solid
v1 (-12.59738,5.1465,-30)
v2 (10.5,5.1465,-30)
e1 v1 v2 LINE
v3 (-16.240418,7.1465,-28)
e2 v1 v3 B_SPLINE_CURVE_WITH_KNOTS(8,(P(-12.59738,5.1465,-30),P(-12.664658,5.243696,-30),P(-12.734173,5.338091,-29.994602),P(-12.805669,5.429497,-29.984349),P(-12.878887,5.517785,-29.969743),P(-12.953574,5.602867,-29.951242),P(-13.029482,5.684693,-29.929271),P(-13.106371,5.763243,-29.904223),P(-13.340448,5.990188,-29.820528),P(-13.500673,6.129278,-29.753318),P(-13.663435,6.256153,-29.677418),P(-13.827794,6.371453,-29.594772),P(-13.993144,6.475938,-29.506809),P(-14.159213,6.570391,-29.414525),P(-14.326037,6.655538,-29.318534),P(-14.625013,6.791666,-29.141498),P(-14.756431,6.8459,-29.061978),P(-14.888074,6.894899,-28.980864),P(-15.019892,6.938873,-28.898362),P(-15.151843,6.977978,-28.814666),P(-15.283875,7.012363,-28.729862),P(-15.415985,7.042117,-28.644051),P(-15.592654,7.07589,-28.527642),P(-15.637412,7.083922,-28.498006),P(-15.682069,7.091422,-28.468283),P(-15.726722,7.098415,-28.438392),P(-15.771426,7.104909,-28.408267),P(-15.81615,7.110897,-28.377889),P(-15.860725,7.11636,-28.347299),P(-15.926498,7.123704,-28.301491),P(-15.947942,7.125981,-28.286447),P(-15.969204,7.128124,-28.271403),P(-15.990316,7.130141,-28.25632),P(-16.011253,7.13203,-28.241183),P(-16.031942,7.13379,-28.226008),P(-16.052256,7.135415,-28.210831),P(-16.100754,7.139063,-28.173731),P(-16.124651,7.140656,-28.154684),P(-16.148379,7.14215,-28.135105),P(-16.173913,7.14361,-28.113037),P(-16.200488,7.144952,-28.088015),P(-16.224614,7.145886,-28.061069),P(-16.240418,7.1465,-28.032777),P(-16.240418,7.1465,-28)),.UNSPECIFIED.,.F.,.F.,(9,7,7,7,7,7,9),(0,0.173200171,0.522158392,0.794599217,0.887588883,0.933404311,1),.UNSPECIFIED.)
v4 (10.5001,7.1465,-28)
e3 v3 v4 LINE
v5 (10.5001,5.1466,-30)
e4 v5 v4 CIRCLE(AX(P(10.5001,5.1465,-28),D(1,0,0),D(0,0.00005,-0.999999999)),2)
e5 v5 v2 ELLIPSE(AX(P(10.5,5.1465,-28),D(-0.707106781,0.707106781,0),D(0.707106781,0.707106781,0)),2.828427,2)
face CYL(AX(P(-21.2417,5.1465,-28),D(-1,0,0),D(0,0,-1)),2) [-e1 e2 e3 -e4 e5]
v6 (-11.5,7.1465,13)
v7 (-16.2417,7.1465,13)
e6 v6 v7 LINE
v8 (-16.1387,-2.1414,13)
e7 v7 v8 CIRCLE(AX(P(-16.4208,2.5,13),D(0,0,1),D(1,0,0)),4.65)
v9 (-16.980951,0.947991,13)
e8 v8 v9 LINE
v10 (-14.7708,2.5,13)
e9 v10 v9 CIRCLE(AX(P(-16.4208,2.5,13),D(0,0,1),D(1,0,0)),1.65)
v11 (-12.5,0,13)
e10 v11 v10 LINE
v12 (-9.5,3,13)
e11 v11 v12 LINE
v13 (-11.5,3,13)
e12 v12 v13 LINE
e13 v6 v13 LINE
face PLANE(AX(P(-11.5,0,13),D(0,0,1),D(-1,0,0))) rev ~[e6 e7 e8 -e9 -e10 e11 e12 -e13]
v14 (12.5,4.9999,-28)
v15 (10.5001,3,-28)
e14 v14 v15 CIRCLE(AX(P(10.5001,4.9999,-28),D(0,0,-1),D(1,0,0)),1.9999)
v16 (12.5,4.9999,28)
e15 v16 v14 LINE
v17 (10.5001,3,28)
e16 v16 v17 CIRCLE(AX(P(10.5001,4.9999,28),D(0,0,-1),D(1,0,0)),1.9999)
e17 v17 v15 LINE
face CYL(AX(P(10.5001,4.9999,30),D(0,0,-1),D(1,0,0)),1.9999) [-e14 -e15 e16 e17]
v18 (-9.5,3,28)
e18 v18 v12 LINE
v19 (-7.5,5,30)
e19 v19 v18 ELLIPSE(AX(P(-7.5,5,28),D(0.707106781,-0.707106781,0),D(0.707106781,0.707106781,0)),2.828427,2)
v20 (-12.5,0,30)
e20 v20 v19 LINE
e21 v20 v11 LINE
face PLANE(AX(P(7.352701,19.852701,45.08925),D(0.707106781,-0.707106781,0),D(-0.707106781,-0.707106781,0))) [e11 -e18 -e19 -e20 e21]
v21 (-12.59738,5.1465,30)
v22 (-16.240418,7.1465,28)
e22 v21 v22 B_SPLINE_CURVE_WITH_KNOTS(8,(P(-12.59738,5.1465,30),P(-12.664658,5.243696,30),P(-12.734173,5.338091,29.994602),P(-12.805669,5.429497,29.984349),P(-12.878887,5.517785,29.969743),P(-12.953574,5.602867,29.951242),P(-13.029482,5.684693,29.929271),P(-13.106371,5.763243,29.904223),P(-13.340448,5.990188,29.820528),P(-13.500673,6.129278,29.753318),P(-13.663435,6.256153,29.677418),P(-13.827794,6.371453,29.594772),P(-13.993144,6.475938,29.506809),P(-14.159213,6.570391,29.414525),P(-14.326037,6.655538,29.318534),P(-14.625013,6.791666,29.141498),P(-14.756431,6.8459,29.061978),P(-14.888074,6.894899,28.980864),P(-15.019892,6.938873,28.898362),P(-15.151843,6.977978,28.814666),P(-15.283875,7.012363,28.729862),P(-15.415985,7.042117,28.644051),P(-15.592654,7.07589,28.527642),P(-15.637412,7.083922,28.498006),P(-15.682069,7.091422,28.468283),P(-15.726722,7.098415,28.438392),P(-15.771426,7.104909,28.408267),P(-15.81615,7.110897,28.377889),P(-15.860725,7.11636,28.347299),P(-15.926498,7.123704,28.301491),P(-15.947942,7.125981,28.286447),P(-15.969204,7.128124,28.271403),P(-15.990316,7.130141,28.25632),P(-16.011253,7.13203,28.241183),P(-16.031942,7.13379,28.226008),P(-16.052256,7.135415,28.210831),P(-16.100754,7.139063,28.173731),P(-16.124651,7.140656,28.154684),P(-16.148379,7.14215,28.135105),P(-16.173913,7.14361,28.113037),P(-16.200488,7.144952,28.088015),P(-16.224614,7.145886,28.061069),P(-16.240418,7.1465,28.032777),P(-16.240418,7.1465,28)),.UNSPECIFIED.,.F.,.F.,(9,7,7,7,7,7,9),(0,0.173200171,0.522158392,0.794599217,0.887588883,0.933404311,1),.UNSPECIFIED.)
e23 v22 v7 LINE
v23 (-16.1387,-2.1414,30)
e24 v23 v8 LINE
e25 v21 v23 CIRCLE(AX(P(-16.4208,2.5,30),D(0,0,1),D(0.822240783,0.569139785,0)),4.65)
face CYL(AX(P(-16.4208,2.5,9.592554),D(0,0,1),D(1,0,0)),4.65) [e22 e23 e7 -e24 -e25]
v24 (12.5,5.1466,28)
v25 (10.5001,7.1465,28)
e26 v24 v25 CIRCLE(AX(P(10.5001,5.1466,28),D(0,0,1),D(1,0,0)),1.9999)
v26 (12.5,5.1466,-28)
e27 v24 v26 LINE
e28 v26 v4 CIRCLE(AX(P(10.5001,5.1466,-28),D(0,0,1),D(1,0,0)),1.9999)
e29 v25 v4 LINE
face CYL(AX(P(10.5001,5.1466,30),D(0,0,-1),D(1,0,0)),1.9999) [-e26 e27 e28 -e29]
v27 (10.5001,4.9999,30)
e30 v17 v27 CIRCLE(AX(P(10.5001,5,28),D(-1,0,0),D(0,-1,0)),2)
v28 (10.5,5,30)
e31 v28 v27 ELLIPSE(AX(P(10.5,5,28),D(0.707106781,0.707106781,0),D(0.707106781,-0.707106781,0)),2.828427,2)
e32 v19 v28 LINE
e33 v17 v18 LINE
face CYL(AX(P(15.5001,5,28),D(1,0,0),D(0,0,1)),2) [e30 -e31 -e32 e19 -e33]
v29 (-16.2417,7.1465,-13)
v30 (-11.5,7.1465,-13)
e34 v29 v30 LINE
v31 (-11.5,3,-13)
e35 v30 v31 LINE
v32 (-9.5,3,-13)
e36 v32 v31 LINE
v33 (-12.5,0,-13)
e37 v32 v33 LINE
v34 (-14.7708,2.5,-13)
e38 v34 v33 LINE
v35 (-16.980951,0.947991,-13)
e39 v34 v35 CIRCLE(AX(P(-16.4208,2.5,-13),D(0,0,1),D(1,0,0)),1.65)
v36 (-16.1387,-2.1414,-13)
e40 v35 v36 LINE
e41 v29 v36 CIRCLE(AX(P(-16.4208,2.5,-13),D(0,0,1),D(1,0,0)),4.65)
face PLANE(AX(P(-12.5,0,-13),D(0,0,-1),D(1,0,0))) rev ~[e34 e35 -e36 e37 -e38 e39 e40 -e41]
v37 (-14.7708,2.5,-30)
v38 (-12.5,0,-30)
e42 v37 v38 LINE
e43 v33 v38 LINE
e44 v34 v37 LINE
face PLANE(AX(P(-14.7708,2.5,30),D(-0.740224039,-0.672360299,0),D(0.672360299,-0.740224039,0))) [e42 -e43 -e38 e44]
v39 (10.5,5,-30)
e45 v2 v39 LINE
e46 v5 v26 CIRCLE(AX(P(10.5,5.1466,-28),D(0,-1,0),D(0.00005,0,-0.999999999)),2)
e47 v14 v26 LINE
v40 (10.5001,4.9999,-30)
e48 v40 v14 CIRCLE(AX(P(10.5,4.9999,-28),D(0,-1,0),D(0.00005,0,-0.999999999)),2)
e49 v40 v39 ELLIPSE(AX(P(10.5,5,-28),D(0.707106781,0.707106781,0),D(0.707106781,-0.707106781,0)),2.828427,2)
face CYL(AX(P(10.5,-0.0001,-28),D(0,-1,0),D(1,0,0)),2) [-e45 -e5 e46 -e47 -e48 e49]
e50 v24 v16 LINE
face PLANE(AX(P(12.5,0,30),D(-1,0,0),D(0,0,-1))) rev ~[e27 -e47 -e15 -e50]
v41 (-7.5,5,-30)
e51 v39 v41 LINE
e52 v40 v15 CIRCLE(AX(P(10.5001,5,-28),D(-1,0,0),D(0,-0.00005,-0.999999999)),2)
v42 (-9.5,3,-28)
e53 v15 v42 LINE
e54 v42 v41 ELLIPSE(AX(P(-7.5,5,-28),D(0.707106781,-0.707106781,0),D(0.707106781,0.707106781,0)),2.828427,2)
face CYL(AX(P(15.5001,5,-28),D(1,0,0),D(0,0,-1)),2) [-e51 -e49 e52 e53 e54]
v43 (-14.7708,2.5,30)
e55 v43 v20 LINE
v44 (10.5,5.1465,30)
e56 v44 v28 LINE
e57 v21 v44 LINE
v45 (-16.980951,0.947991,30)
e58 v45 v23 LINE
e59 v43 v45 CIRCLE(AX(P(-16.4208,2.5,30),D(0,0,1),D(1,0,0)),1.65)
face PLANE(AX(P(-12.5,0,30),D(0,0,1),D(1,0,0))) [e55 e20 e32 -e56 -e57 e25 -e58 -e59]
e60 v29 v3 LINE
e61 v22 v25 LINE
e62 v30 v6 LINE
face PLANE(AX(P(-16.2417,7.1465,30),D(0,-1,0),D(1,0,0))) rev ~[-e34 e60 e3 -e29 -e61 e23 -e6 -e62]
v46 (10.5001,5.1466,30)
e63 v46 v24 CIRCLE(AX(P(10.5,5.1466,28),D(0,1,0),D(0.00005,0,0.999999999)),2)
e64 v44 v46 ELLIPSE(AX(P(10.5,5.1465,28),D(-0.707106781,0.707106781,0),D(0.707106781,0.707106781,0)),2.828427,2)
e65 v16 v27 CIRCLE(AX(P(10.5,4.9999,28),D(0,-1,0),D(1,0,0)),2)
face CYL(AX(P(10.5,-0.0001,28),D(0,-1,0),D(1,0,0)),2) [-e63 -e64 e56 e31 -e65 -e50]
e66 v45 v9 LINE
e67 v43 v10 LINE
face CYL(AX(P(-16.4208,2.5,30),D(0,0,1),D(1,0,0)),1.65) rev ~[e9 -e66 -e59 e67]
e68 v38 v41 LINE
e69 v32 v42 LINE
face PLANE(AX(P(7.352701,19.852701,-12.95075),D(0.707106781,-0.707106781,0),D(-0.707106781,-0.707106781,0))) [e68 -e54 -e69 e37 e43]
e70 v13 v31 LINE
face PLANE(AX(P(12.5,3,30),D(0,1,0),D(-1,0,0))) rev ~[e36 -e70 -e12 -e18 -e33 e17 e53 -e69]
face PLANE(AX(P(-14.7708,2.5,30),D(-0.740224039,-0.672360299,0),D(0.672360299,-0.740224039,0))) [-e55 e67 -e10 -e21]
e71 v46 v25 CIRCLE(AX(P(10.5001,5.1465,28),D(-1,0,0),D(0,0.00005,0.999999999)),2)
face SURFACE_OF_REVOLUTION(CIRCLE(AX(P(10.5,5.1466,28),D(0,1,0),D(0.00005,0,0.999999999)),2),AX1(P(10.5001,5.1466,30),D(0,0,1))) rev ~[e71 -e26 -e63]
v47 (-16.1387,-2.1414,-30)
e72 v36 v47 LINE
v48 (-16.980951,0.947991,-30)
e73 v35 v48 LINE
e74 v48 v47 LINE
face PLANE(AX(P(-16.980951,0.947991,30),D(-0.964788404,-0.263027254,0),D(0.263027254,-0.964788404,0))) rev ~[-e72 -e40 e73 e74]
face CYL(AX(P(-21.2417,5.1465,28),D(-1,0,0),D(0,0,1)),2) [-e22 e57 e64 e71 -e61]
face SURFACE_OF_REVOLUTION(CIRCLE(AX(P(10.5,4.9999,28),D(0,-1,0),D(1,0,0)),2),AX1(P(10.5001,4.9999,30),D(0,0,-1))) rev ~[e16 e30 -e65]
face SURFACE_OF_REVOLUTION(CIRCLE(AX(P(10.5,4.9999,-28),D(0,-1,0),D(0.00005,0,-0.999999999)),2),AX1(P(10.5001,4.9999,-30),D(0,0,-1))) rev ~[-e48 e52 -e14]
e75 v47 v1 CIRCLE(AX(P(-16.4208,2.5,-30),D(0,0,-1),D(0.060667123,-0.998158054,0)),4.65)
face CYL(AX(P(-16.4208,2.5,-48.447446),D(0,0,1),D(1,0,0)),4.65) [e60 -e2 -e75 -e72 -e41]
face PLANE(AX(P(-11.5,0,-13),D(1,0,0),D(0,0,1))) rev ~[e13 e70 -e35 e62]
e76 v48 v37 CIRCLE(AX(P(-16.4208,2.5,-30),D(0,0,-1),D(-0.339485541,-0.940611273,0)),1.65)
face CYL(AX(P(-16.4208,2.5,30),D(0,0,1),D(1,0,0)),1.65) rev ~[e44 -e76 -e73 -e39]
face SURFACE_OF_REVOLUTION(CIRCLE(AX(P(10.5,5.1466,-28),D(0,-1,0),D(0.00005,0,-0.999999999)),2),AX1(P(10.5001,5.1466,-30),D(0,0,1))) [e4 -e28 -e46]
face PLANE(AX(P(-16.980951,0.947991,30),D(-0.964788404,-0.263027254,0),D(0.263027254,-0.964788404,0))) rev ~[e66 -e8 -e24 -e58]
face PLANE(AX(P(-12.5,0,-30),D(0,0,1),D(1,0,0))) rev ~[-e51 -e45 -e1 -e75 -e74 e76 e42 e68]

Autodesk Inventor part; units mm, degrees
ref_plane "YZ Plane" through (0, 0, 0) normal (1, 0, 0) x (0, 1, 0)
ref_plane "XZ Plane" through (0, 0, 0) normal (0, 1, 0) x (-1, 0, 0)
ref_plane "XY Plane" through (0, 0, 0) normal (0, 0, 1) x (1, 0, 0)
sketch "Boceto1" plane through (0, 0, 0) normal (0, 1, 0) x (-1, 0, 0)
  line L0 (-12.5, -30) -> (12.5, -30)
  line L1 (12.5, -30) -> (12.5, 30)
  line L2 (12.5, 30) -> (-12.5, 30)
  line L3 (-12.5, 30) -> (-12.5, -30)
  line L4 (-12.5, -30) -> (12.5, 30) construction
  line L5 (12.5, -30) -> (-12.5, 30) construction
  line L6 (61.5, -13) -> (11.5, -13)
  line L7 (11.5, -13) -> (11.5, 13)
  line L8 (11.5, 13) -> (61.5, 13)
  line L9 (61.5, 13) -> (61.5, -13)
  line L10 (12.5, 0) -> (11.5, 0) construction
  point P0 (0, 0)
  point P1 (12.5, 13)
  point P2 (12.5, -13)
  dimension "d0" = 25
  dimension "d1" = 60
  dimension "d8" = 50
  dimension "d9" = 26
  dimension "d10" = 1
extrude "Extrusión1" add sketch "Boceto1" along normal blind 5 contours L3 L2 L1 L8 L7 L6 L0 | L6 L7 L8 L1
sketch "Boceto2" plane through (-12.5, 0, 30) normal (0, 0, 1) x (1, 0, 0)
  circle A0 centre (-3.9208, 2.5) radius 1.65
  line L0 (0, 0) -> (0, 5) construction
  line L1 (0, 2.5) -> (-8.4797, 2.5) construction
  circle A1 centre (-3.9208, 2.5) radius 4.65
  line L2 (-2.2708, 2.5) -> (0, 0)
  line L3 (-2.2708, 2.5) -> (-26.7468, 29.4468) construction
  line L4 (-6.0334, 6.6424) -> (-3.6387, -2.1414)
  line L5 (0, 5) -> (25, 5) projected
  line L6 (-3.7417, 7.1465) -> (25, 7.1465)
  line L7 (25, 7.1465) -> (25, 5)
  line L8 (25, 5) -> (-3.7417, 5)
  line L9 (-3.7417, 5) -> (-3.7417, 7.1465)
  arc A2 (0, 0) -> (0.7292, 2.5) centre (-3.9208, 2.5) ccw
  line L10 (-6.0334, 6.6424) -> (-1.5623, -1.5075) construction
  point P0 (12.5, 0)
  point P1 (-4.481, 0.948)
  dimension "d4" = 3.3
  dimension "d5" = 3
extrude "Extrusión2" add sketch "Boceto2" against normal blind 60 contours A0 L4 A1 L9 L8 L2 | A0 L4 A1 | L6 L7 L5 A1 | A1 L8 L9
extrude "Extrusión3" cut sketch "Boceto1" along normal through all both and the other way through all contours L6 L7 L8 L1 | L1 L8 L9 L6
sketch "Boceto3" plane through (-16.2417, 7.1465, 30) normal (0, 0, 1) x (1, 0, 0)
  line L0 (3.7417, -7.1465) -> (28.7417, -7.1465) projected
  line L1 (28.7417, -7.1465) -> (28.7417, 0) projected
  line L2 (3.7417, -7.1465) -> (28.7417, -7.1465)
  line L3 (28.7417, -7.1465) -> (28.7417, -4.1465)
  line L4 (28.7417, -4.1465) -> (3.7417, -4.1465)
  line L5 (3.7417, -4.1465) -> (3.7417, -7.1465)
  line L6 (3.7417, -7.1465) -> (6.7417, -4.1465)
  line L7 (3.7417, -7.1465) -> (7.9843, -7.1465) construction
  point P0 (16.2417, -7.1465)
  dimension "d13" = 3
  dimension "d16" = 45
extrude "Extrusión4" cut sketch "Boceto3" against normal blind 60 contours L6 L4 L1 L0
extrude "Extrusión5" cut sketch "Boceto3" along normal up to surface (26 mm away) from surface at -43 contours L5 L4 L6
fillet "Empalme1" radius 2 2 edges at (12.5, 7.1465, 0) (12.5, 3, 0)
fillet "Empalme2" radius 2 10 edges at (11.9142, 6.5608, 30) (12.5, 5.0733, 30) (11.9142, 3.5858, 30) (0.5, 3, 30) (-2.8708, 7.1465, 30) (11.9142, 6.5608, -30) (12.5, 5.0733, -30) (11.9142, 3.5858, -30) (0.5, 3, -30) (-2.8708, 7.1465, -30)
